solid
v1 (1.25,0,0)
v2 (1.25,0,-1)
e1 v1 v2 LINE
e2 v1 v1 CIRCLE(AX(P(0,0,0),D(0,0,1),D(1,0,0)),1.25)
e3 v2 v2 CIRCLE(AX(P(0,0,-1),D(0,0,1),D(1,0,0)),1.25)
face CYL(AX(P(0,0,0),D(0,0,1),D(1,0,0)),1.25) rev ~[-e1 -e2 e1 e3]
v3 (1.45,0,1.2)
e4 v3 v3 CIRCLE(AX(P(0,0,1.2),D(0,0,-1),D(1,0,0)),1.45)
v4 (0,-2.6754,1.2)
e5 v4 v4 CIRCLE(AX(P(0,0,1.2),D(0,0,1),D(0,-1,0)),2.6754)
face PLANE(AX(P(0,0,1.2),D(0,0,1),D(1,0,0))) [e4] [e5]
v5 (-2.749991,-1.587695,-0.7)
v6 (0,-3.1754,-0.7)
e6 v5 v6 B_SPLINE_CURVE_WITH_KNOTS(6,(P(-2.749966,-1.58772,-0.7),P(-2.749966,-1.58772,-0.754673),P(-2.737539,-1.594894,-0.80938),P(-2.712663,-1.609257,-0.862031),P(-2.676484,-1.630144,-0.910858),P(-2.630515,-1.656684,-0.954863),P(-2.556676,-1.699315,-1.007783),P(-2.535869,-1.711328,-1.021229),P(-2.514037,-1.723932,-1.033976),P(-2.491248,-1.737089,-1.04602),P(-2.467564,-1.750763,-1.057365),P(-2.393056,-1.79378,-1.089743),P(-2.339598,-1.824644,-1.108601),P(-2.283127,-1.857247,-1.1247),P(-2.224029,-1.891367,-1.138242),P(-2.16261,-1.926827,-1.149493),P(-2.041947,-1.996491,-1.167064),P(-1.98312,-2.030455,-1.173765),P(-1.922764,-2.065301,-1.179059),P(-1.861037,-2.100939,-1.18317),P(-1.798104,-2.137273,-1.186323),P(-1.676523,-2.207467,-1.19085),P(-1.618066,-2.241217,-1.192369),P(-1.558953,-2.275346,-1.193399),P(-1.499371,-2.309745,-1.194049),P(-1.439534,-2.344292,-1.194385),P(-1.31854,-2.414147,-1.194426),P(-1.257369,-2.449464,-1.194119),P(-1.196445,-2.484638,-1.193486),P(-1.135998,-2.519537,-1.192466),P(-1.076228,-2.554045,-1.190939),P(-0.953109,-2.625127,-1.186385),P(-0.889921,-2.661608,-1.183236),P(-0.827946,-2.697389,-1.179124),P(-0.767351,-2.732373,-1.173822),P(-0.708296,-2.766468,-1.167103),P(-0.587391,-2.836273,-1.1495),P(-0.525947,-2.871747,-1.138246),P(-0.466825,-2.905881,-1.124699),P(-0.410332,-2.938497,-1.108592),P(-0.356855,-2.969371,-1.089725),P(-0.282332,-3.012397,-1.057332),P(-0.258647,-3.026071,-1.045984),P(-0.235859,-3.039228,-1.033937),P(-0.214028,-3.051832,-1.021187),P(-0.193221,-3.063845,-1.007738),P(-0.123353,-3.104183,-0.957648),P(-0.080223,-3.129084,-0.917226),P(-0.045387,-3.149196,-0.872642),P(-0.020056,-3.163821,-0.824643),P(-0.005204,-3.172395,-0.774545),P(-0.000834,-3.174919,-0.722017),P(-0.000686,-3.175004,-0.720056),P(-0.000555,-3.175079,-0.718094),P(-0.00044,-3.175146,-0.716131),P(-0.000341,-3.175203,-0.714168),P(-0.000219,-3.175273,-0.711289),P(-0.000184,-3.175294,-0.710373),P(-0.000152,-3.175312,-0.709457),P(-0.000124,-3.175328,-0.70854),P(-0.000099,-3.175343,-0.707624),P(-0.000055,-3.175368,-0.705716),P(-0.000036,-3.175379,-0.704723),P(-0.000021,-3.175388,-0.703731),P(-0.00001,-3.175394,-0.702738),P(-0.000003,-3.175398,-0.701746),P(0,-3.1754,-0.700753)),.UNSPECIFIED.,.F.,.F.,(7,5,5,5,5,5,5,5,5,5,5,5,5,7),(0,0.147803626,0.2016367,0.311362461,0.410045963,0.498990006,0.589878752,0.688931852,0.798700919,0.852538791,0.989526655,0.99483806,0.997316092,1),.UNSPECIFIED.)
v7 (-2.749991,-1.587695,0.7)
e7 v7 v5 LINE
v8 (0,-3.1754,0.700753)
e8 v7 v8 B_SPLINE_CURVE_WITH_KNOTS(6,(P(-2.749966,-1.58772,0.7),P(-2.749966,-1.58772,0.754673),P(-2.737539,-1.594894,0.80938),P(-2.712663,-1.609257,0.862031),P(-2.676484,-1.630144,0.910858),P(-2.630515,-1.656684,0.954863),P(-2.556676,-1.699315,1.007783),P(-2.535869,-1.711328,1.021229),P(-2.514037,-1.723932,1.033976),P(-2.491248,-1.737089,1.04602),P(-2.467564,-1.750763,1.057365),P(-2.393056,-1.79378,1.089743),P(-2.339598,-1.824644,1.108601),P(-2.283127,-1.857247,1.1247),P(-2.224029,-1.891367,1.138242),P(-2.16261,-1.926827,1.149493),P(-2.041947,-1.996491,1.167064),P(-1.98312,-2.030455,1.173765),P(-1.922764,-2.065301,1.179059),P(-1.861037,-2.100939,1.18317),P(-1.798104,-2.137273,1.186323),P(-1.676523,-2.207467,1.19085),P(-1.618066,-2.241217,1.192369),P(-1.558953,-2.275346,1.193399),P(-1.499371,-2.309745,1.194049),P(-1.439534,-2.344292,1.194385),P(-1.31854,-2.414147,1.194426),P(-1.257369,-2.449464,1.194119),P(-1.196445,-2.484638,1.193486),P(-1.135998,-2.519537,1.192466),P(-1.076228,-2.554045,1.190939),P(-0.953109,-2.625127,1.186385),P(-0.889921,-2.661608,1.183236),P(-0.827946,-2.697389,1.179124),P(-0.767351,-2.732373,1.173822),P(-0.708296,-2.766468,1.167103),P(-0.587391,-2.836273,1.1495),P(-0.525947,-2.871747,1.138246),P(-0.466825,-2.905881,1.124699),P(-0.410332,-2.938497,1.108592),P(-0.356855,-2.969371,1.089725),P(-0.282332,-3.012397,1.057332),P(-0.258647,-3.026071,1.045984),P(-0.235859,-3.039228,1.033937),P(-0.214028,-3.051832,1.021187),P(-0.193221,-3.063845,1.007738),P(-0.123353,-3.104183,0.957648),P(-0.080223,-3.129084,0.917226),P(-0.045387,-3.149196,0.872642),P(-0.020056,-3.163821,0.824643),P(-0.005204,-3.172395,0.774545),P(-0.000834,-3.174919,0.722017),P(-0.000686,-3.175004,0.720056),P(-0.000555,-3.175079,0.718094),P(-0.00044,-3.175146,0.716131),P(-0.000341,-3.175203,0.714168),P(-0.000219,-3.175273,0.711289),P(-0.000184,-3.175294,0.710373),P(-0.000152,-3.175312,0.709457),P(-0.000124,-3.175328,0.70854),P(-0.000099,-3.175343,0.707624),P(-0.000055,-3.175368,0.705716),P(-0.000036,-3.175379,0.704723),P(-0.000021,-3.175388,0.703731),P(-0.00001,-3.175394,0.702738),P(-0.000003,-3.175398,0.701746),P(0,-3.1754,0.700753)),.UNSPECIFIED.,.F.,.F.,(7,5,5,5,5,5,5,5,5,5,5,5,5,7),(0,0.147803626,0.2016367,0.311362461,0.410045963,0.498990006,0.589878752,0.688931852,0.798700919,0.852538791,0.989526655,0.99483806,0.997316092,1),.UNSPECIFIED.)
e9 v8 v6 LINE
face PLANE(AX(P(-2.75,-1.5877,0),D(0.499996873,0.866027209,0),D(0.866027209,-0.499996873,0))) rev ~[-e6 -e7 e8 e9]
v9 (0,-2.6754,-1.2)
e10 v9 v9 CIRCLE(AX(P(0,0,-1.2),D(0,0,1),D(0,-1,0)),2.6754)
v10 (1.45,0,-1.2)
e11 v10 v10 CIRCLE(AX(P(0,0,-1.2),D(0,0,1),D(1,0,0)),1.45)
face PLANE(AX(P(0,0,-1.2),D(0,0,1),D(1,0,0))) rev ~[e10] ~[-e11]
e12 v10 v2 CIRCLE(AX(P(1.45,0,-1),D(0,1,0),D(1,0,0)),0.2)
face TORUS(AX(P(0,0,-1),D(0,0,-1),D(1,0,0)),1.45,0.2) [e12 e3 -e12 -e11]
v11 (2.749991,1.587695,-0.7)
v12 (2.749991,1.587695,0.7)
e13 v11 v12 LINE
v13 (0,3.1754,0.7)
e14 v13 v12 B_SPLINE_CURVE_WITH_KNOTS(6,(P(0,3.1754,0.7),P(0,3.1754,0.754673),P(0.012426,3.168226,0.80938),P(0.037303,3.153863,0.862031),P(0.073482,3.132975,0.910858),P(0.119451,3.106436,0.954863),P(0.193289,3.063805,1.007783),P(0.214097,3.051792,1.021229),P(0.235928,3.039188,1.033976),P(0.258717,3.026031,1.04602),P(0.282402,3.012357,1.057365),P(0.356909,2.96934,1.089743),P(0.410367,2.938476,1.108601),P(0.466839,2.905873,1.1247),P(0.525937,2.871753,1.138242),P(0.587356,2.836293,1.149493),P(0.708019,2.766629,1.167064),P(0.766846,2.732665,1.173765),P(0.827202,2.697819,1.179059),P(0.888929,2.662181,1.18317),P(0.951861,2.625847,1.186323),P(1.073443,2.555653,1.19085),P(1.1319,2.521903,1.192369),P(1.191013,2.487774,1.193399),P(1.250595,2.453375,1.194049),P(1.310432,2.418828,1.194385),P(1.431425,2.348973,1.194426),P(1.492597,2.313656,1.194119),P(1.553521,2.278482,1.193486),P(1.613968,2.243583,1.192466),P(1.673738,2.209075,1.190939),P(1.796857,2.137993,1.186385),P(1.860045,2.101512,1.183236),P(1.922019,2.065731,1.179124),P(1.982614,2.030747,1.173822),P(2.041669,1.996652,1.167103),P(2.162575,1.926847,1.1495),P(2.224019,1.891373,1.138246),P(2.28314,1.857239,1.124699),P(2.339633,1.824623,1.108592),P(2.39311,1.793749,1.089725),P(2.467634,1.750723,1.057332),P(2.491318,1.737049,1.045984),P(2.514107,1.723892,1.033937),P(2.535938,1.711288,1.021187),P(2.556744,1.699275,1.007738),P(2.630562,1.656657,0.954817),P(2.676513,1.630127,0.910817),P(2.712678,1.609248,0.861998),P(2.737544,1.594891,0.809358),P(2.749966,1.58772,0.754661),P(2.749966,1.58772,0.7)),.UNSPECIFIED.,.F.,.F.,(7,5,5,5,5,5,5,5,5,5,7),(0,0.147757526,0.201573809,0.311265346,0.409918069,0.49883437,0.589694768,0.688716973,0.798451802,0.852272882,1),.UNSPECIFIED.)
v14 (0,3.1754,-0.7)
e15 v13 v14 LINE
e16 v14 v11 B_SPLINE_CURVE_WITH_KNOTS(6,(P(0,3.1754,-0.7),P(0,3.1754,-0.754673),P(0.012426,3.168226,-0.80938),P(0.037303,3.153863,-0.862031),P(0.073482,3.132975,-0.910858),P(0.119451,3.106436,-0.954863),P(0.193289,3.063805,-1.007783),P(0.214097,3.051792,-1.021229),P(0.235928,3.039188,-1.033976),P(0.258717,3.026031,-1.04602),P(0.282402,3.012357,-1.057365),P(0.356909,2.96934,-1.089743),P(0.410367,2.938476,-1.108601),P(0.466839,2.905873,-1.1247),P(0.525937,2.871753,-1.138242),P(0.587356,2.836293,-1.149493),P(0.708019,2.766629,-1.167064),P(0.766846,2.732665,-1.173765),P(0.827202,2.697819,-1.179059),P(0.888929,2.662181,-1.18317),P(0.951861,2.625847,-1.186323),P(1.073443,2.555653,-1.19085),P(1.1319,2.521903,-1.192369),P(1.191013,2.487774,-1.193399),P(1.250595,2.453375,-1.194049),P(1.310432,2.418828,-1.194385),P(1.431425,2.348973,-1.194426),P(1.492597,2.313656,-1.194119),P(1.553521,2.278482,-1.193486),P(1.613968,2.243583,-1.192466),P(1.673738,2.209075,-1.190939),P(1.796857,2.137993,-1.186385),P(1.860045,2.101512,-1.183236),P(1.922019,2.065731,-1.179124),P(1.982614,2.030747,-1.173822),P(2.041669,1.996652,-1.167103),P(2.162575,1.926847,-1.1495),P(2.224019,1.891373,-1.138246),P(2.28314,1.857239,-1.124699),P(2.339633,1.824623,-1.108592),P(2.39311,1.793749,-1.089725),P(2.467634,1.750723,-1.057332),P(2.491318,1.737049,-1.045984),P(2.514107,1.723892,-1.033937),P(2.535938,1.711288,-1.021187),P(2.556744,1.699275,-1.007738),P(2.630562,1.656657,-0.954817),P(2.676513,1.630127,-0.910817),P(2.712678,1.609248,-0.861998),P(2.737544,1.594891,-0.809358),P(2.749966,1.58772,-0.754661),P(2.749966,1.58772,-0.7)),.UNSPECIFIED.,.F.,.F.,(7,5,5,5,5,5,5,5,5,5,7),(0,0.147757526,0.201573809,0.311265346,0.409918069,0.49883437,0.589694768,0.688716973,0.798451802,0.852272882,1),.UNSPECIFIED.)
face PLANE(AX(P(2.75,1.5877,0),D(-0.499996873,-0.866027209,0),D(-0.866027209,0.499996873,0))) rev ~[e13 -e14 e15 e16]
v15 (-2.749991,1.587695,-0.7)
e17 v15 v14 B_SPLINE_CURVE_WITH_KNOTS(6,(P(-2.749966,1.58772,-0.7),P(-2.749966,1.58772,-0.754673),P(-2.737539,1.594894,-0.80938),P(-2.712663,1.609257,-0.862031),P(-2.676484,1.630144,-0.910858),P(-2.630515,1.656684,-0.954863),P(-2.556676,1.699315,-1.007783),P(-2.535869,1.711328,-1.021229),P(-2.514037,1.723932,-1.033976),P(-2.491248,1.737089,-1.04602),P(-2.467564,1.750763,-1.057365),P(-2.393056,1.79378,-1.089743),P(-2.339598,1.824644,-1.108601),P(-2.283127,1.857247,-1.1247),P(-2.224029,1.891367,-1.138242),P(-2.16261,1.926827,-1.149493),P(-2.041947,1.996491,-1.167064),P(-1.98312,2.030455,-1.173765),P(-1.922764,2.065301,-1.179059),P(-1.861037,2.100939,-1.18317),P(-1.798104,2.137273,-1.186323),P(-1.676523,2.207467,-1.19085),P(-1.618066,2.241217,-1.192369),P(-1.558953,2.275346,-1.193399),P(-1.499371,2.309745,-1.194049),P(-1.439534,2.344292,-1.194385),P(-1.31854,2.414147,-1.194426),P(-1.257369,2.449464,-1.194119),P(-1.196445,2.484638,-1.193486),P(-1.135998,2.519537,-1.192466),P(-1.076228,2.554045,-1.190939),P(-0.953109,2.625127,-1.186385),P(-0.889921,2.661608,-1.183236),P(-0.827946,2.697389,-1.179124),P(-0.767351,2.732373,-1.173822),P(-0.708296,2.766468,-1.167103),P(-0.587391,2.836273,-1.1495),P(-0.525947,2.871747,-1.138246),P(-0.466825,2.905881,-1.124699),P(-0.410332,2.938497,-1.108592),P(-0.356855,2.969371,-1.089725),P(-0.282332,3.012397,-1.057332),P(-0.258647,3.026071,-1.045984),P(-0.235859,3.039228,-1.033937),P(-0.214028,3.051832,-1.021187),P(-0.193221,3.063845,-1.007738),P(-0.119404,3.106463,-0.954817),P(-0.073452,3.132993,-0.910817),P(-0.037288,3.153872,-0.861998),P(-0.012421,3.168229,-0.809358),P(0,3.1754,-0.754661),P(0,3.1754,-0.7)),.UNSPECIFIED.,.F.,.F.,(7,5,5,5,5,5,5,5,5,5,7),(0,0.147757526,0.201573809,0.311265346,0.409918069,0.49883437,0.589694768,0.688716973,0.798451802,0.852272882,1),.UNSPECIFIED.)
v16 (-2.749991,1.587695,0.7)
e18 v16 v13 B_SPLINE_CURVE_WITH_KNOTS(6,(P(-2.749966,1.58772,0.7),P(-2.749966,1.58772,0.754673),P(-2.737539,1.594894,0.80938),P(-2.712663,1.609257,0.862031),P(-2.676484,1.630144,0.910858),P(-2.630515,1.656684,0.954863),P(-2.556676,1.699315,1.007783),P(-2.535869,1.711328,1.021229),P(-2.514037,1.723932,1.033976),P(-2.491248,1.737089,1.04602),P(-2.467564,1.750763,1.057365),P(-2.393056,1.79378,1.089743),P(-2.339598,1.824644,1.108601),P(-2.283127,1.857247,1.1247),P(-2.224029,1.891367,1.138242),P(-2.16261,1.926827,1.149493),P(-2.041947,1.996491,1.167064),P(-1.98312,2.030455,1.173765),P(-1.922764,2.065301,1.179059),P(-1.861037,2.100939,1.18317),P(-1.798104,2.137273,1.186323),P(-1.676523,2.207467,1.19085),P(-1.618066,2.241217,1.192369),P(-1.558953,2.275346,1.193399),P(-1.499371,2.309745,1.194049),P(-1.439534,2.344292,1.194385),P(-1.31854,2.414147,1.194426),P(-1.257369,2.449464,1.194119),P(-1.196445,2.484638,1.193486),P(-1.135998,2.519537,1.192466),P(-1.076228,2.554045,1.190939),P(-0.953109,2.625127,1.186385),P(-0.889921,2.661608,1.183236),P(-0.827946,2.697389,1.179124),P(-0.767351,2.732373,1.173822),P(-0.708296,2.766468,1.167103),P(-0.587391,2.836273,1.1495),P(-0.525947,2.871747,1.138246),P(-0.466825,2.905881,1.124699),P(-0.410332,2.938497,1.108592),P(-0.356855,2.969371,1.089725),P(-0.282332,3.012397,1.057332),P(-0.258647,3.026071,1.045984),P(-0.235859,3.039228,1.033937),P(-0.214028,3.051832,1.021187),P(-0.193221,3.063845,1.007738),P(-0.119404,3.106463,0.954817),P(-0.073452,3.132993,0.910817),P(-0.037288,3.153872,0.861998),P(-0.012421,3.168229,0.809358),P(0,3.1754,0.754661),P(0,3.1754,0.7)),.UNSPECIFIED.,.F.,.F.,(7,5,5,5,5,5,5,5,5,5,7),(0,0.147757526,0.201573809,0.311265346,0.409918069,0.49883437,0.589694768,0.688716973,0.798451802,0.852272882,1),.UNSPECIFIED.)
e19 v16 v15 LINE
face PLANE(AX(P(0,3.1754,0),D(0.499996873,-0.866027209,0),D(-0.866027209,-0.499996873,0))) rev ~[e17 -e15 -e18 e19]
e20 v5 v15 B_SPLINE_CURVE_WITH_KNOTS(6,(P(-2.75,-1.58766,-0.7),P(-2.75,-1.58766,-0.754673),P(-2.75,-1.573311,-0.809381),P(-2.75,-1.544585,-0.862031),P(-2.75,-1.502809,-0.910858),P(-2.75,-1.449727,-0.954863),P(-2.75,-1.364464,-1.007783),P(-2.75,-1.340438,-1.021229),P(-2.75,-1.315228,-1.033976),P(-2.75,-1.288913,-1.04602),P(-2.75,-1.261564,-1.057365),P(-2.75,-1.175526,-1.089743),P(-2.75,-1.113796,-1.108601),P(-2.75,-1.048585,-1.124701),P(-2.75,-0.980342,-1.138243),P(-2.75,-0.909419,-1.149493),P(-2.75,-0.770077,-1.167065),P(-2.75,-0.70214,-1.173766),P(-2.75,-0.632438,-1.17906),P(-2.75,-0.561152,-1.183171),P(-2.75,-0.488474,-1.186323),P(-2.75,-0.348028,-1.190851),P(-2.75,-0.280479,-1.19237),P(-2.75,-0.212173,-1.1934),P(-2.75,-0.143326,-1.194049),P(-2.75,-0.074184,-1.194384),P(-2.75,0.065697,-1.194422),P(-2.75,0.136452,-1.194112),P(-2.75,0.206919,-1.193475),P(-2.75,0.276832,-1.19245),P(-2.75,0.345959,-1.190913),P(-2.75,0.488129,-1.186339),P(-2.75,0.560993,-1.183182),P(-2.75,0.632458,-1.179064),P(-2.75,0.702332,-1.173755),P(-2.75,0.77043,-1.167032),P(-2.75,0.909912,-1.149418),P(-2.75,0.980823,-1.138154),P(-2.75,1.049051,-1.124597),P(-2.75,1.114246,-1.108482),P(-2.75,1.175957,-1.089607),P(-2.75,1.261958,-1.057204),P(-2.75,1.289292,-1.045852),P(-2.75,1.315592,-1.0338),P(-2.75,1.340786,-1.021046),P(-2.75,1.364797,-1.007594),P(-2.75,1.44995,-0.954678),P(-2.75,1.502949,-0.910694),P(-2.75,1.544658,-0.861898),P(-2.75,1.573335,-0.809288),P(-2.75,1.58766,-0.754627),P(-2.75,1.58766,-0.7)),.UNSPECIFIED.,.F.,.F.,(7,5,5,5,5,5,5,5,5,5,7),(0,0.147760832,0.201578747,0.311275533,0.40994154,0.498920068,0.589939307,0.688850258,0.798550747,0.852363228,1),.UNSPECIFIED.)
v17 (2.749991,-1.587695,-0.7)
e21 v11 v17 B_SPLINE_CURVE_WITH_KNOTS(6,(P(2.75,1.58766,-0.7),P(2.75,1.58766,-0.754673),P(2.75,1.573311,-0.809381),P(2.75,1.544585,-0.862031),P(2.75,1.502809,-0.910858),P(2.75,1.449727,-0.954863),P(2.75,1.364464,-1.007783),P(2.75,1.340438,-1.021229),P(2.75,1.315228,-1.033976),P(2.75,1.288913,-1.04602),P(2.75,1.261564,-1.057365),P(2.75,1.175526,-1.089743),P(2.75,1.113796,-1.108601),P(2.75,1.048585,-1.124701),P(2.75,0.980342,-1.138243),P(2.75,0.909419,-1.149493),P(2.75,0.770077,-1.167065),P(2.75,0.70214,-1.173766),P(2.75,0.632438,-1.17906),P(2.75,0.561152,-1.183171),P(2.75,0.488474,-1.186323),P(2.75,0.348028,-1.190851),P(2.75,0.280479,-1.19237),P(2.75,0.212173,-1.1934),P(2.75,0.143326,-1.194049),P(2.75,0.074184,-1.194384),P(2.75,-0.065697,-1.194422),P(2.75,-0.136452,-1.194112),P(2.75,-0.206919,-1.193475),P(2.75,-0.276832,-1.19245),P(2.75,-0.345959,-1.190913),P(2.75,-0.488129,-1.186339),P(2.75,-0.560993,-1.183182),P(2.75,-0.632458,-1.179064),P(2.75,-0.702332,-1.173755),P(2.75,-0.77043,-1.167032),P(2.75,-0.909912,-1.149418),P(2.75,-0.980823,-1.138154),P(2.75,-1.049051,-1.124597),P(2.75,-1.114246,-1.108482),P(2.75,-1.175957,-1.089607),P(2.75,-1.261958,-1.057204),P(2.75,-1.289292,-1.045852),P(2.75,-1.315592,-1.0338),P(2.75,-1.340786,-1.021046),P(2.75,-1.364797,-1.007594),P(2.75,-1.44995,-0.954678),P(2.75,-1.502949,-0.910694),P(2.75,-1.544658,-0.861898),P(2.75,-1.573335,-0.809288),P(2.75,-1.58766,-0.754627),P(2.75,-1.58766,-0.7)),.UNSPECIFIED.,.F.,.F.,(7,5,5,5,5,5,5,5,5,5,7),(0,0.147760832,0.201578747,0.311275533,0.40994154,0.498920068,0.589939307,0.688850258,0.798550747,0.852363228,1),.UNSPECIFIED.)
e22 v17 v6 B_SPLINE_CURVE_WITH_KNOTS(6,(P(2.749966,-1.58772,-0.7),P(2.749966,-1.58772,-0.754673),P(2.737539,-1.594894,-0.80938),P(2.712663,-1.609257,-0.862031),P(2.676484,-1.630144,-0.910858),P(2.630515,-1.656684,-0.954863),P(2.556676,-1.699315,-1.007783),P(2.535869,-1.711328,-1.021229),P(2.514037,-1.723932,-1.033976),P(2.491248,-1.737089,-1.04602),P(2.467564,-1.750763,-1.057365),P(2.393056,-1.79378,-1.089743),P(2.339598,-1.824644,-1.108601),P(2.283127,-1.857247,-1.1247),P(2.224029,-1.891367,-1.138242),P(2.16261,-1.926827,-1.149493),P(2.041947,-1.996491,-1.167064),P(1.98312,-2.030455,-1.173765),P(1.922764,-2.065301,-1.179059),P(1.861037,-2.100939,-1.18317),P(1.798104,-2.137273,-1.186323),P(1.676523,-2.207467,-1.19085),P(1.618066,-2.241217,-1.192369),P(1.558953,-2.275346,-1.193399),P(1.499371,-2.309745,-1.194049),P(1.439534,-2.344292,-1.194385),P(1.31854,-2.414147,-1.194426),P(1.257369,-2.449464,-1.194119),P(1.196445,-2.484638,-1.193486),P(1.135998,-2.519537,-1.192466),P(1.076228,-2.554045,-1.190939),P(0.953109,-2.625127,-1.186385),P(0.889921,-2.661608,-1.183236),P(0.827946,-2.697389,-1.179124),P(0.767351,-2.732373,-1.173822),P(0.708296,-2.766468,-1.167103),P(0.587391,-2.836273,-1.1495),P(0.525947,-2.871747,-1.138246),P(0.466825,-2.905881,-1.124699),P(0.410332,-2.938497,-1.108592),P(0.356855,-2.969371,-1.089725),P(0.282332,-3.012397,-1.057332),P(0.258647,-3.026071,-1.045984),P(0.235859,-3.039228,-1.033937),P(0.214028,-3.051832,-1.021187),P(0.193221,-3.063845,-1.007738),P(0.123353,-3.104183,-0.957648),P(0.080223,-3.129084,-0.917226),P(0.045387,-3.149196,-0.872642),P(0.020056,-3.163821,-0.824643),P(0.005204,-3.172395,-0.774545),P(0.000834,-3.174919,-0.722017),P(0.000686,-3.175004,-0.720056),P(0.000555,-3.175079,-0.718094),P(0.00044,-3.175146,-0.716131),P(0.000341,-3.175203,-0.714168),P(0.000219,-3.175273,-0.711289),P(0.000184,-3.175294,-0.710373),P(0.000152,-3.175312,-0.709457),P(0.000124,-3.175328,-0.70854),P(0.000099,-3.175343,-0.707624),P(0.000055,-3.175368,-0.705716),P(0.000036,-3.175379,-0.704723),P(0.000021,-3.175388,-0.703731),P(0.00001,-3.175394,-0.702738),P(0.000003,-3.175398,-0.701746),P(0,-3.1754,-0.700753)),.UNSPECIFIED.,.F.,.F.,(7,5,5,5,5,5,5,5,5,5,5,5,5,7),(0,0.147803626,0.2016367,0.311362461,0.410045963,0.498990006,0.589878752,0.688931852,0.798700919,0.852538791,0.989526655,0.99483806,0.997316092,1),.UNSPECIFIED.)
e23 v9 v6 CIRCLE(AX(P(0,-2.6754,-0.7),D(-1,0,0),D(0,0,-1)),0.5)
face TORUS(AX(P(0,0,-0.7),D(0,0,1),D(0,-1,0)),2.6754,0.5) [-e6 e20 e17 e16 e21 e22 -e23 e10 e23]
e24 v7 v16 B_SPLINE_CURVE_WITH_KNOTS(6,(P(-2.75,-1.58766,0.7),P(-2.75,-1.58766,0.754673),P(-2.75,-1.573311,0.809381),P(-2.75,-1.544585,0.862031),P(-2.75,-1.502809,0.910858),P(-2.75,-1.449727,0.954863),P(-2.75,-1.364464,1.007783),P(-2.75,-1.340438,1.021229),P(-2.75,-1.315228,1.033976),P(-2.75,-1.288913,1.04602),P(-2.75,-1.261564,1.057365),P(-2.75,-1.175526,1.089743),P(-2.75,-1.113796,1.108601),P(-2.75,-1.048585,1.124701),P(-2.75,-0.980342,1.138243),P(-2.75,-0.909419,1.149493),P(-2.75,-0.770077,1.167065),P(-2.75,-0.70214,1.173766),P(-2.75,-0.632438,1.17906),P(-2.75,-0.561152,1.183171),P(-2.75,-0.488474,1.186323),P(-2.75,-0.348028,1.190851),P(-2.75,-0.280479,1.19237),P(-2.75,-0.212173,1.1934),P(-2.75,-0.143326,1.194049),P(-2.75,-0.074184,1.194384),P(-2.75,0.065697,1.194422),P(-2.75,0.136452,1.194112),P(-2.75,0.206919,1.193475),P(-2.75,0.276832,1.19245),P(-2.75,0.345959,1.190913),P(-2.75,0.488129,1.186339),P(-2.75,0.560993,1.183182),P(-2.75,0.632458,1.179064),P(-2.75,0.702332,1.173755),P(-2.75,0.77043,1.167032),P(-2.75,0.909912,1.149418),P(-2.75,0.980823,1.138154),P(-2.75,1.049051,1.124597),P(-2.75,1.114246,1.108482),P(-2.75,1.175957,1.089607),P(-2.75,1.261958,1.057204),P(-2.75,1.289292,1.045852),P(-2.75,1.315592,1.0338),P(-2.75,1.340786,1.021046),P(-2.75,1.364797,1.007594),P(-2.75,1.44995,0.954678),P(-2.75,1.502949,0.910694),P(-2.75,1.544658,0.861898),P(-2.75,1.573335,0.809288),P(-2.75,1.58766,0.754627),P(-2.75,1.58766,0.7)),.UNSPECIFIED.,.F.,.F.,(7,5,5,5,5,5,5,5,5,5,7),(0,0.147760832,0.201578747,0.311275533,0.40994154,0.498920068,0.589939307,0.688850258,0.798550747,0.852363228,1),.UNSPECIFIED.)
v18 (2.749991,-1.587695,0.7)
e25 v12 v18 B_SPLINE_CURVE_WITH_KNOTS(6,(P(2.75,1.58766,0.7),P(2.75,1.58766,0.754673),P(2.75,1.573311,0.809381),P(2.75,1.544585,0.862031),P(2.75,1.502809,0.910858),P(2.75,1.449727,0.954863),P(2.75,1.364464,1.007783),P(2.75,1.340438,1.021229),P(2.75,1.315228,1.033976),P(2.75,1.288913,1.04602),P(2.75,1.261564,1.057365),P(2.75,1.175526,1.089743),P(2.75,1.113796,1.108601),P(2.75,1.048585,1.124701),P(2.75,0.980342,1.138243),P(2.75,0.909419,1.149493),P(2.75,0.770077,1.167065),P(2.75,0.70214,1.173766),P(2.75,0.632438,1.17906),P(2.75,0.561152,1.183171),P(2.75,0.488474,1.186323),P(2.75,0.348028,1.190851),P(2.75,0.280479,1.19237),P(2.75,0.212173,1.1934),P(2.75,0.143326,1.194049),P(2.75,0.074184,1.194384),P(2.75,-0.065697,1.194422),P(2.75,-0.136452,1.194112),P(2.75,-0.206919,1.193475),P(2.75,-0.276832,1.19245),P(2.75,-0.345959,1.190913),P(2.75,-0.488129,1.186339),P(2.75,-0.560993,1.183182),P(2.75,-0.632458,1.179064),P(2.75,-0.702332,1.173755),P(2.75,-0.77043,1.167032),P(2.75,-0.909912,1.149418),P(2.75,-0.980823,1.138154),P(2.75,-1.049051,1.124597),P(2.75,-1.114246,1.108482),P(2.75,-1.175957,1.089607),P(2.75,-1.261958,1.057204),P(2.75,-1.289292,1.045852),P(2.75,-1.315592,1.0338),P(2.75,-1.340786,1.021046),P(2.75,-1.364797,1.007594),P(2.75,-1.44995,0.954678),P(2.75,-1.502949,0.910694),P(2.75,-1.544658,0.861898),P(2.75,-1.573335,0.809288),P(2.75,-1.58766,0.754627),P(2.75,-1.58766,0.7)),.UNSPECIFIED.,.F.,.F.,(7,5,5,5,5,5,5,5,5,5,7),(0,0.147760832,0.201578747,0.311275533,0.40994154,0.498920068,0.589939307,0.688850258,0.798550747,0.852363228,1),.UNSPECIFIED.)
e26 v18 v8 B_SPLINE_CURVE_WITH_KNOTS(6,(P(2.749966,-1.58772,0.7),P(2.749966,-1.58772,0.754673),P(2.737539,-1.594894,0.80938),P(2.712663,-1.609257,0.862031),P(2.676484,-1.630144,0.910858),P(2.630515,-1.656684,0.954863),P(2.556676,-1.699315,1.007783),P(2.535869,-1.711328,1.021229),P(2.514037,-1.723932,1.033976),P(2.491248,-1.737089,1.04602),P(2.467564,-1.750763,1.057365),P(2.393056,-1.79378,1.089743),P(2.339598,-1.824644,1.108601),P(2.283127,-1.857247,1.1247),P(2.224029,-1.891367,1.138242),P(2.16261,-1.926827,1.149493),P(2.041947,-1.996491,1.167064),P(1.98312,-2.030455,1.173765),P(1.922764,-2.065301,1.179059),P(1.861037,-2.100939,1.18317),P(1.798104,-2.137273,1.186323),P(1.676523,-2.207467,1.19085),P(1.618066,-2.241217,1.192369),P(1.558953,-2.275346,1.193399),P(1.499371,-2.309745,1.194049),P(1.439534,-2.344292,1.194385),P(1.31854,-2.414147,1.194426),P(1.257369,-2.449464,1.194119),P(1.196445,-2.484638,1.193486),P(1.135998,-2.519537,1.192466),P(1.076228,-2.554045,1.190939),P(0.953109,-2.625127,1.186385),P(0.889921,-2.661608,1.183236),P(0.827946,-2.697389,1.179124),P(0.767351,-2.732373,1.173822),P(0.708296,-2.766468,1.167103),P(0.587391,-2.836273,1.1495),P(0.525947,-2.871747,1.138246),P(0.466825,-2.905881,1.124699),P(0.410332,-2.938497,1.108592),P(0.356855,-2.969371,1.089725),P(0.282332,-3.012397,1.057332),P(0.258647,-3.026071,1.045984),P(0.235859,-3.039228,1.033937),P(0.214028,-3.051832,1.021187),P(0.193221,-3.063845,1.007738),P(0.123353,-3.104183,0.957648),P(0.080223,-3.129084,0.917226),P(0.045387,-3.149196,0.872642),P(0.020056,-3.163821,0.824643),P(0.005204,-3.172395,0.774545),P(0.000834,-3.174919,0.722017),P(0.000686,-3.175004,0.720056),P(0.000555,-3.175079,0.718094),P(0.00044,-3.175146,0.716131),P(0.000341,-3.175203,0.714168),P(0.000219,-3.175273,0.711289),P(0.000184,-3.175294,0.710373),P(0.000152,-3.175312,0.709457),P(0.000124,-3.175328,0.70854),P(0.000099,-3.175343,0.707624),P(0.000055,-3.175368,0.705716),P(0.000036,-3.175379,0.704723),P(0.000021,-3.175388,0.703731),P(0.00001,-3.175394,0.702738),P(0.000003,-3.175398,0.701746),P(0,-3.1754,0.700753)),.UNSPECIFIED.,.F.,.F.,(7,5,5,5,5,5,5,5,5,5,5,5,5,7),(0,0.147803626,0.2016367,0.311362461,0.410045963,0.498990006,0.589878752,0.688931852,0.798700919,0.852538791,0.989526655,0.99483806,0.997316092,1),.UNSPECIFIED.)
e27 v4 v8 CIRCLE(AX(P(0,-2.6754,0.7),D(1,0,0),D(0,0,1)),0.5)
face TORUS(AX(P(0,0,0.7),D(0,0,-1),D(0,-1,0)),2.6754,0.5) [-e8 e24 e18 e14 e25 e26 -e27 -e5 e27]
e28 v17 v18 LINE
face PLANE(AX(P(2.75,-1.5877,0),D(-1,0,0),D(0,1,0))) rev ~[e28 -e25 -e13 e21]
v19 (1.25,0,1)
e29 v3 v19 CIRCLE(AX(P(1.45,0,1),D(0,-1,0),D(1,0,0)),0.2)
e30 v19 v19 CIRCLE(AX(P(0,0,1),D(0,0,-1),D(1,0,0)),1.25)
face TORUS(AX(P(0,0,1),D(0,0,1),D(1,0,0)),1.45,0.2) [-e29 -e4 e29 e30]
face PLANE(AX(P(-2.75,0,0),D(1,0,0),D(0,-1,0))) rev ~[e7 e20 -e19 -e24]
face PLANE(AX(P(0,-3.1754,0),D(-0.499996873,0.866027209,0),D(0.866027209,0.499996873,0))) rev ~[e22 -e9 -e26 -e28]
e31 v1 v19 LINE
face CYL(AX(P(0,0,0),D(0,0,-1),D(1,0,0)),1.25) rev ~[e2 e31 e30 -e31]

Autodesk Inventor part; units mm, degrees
ref_plane "YZ Plane" through (0, 0, 0) normal (1, 0, 0) x (0, 1, 0)
ref_plane "XZ Plane" through (0, 0, 0) normal (0, 1, 0) x (-1, 0, 0)
ref_plane "XY Plane" through (0, 0, 0) normal (0, 0, 1) x (1, 0, 0)
sketch "Sketch1" plane through (0, 0, 0) normal (0, 0, 1) x (1, 0, 0)
  line L0 (0, -4.4456) -> (0, 4.4456) projected
  line L1 (-3.85, 0) -> (3.85, 0) projected
  line L2 (0, 3.1754) -> (-2.75, 1.5877)
  line L3 (-2.75, 1.5877) -> (-2.75, -1.5877)
  line L4 (-2.75, -1.5877) -> (0, -3.1754)
  line L5 (0, -3.1754) -> (2.75, -1.5877)
  line L6 (2.75, -1.5877) -> (2.75, 1.5877)
  line L7 (2.75, 1.5877) -> (0, 3.1754)
  circle A0 centre (0, 0) radius 1.25
  point P0 (-2.75, 0)
  dimension "d2" = 120
  dimension "d3" = 5.5
  dimension "d6" = 2.5
extrude "Extrusion2" add sketch "Sketch1" along normal mid plane 2.4
extrude "Extrusion3" cut sketch "Sketch1" along normal through all both and the other way through all contours A0 L1 L0 | L0 L1 A0 | L1 A0 L0 | L0 A0 L1
fillet "Fillet1" radius 0.2 2 edges at (-1.25, 0, 1.2) (-1.25, 0, -1.2)
thread "Thread1" size "M3x0.5" class "6H" standard "ANSI Metric M Profile" full length
sketch "Sketch2" plane through (0, 0, 0) normal (1, 0, 0) x (0, 1, 0)
  line L0 (0, -1.6883) -> (0, 1.7297) projected
  line L1 (-3.1754, 1.2) -> (-1.5877, 1.2) projected
  line L2 (-3.1754, -1.2) -> (-3.1754, 1.2) projected
  arc A0 (-2.6754, 1.2) -> (-3.1754, 0.7) centre (-2.6754, 0.7) ccw
  point P0 (0, 0)
  dimension "d14" = 0.5
revolve "Revolution1" cut sketch "Sketch2" angle 360 about axis through (0, 0, -10) along (0, 0, 1)
mirror "Mirror1" about plane through (0, 0, 0) normal (0, 0, 1) of "Revolution1"
properties part number "empty"
